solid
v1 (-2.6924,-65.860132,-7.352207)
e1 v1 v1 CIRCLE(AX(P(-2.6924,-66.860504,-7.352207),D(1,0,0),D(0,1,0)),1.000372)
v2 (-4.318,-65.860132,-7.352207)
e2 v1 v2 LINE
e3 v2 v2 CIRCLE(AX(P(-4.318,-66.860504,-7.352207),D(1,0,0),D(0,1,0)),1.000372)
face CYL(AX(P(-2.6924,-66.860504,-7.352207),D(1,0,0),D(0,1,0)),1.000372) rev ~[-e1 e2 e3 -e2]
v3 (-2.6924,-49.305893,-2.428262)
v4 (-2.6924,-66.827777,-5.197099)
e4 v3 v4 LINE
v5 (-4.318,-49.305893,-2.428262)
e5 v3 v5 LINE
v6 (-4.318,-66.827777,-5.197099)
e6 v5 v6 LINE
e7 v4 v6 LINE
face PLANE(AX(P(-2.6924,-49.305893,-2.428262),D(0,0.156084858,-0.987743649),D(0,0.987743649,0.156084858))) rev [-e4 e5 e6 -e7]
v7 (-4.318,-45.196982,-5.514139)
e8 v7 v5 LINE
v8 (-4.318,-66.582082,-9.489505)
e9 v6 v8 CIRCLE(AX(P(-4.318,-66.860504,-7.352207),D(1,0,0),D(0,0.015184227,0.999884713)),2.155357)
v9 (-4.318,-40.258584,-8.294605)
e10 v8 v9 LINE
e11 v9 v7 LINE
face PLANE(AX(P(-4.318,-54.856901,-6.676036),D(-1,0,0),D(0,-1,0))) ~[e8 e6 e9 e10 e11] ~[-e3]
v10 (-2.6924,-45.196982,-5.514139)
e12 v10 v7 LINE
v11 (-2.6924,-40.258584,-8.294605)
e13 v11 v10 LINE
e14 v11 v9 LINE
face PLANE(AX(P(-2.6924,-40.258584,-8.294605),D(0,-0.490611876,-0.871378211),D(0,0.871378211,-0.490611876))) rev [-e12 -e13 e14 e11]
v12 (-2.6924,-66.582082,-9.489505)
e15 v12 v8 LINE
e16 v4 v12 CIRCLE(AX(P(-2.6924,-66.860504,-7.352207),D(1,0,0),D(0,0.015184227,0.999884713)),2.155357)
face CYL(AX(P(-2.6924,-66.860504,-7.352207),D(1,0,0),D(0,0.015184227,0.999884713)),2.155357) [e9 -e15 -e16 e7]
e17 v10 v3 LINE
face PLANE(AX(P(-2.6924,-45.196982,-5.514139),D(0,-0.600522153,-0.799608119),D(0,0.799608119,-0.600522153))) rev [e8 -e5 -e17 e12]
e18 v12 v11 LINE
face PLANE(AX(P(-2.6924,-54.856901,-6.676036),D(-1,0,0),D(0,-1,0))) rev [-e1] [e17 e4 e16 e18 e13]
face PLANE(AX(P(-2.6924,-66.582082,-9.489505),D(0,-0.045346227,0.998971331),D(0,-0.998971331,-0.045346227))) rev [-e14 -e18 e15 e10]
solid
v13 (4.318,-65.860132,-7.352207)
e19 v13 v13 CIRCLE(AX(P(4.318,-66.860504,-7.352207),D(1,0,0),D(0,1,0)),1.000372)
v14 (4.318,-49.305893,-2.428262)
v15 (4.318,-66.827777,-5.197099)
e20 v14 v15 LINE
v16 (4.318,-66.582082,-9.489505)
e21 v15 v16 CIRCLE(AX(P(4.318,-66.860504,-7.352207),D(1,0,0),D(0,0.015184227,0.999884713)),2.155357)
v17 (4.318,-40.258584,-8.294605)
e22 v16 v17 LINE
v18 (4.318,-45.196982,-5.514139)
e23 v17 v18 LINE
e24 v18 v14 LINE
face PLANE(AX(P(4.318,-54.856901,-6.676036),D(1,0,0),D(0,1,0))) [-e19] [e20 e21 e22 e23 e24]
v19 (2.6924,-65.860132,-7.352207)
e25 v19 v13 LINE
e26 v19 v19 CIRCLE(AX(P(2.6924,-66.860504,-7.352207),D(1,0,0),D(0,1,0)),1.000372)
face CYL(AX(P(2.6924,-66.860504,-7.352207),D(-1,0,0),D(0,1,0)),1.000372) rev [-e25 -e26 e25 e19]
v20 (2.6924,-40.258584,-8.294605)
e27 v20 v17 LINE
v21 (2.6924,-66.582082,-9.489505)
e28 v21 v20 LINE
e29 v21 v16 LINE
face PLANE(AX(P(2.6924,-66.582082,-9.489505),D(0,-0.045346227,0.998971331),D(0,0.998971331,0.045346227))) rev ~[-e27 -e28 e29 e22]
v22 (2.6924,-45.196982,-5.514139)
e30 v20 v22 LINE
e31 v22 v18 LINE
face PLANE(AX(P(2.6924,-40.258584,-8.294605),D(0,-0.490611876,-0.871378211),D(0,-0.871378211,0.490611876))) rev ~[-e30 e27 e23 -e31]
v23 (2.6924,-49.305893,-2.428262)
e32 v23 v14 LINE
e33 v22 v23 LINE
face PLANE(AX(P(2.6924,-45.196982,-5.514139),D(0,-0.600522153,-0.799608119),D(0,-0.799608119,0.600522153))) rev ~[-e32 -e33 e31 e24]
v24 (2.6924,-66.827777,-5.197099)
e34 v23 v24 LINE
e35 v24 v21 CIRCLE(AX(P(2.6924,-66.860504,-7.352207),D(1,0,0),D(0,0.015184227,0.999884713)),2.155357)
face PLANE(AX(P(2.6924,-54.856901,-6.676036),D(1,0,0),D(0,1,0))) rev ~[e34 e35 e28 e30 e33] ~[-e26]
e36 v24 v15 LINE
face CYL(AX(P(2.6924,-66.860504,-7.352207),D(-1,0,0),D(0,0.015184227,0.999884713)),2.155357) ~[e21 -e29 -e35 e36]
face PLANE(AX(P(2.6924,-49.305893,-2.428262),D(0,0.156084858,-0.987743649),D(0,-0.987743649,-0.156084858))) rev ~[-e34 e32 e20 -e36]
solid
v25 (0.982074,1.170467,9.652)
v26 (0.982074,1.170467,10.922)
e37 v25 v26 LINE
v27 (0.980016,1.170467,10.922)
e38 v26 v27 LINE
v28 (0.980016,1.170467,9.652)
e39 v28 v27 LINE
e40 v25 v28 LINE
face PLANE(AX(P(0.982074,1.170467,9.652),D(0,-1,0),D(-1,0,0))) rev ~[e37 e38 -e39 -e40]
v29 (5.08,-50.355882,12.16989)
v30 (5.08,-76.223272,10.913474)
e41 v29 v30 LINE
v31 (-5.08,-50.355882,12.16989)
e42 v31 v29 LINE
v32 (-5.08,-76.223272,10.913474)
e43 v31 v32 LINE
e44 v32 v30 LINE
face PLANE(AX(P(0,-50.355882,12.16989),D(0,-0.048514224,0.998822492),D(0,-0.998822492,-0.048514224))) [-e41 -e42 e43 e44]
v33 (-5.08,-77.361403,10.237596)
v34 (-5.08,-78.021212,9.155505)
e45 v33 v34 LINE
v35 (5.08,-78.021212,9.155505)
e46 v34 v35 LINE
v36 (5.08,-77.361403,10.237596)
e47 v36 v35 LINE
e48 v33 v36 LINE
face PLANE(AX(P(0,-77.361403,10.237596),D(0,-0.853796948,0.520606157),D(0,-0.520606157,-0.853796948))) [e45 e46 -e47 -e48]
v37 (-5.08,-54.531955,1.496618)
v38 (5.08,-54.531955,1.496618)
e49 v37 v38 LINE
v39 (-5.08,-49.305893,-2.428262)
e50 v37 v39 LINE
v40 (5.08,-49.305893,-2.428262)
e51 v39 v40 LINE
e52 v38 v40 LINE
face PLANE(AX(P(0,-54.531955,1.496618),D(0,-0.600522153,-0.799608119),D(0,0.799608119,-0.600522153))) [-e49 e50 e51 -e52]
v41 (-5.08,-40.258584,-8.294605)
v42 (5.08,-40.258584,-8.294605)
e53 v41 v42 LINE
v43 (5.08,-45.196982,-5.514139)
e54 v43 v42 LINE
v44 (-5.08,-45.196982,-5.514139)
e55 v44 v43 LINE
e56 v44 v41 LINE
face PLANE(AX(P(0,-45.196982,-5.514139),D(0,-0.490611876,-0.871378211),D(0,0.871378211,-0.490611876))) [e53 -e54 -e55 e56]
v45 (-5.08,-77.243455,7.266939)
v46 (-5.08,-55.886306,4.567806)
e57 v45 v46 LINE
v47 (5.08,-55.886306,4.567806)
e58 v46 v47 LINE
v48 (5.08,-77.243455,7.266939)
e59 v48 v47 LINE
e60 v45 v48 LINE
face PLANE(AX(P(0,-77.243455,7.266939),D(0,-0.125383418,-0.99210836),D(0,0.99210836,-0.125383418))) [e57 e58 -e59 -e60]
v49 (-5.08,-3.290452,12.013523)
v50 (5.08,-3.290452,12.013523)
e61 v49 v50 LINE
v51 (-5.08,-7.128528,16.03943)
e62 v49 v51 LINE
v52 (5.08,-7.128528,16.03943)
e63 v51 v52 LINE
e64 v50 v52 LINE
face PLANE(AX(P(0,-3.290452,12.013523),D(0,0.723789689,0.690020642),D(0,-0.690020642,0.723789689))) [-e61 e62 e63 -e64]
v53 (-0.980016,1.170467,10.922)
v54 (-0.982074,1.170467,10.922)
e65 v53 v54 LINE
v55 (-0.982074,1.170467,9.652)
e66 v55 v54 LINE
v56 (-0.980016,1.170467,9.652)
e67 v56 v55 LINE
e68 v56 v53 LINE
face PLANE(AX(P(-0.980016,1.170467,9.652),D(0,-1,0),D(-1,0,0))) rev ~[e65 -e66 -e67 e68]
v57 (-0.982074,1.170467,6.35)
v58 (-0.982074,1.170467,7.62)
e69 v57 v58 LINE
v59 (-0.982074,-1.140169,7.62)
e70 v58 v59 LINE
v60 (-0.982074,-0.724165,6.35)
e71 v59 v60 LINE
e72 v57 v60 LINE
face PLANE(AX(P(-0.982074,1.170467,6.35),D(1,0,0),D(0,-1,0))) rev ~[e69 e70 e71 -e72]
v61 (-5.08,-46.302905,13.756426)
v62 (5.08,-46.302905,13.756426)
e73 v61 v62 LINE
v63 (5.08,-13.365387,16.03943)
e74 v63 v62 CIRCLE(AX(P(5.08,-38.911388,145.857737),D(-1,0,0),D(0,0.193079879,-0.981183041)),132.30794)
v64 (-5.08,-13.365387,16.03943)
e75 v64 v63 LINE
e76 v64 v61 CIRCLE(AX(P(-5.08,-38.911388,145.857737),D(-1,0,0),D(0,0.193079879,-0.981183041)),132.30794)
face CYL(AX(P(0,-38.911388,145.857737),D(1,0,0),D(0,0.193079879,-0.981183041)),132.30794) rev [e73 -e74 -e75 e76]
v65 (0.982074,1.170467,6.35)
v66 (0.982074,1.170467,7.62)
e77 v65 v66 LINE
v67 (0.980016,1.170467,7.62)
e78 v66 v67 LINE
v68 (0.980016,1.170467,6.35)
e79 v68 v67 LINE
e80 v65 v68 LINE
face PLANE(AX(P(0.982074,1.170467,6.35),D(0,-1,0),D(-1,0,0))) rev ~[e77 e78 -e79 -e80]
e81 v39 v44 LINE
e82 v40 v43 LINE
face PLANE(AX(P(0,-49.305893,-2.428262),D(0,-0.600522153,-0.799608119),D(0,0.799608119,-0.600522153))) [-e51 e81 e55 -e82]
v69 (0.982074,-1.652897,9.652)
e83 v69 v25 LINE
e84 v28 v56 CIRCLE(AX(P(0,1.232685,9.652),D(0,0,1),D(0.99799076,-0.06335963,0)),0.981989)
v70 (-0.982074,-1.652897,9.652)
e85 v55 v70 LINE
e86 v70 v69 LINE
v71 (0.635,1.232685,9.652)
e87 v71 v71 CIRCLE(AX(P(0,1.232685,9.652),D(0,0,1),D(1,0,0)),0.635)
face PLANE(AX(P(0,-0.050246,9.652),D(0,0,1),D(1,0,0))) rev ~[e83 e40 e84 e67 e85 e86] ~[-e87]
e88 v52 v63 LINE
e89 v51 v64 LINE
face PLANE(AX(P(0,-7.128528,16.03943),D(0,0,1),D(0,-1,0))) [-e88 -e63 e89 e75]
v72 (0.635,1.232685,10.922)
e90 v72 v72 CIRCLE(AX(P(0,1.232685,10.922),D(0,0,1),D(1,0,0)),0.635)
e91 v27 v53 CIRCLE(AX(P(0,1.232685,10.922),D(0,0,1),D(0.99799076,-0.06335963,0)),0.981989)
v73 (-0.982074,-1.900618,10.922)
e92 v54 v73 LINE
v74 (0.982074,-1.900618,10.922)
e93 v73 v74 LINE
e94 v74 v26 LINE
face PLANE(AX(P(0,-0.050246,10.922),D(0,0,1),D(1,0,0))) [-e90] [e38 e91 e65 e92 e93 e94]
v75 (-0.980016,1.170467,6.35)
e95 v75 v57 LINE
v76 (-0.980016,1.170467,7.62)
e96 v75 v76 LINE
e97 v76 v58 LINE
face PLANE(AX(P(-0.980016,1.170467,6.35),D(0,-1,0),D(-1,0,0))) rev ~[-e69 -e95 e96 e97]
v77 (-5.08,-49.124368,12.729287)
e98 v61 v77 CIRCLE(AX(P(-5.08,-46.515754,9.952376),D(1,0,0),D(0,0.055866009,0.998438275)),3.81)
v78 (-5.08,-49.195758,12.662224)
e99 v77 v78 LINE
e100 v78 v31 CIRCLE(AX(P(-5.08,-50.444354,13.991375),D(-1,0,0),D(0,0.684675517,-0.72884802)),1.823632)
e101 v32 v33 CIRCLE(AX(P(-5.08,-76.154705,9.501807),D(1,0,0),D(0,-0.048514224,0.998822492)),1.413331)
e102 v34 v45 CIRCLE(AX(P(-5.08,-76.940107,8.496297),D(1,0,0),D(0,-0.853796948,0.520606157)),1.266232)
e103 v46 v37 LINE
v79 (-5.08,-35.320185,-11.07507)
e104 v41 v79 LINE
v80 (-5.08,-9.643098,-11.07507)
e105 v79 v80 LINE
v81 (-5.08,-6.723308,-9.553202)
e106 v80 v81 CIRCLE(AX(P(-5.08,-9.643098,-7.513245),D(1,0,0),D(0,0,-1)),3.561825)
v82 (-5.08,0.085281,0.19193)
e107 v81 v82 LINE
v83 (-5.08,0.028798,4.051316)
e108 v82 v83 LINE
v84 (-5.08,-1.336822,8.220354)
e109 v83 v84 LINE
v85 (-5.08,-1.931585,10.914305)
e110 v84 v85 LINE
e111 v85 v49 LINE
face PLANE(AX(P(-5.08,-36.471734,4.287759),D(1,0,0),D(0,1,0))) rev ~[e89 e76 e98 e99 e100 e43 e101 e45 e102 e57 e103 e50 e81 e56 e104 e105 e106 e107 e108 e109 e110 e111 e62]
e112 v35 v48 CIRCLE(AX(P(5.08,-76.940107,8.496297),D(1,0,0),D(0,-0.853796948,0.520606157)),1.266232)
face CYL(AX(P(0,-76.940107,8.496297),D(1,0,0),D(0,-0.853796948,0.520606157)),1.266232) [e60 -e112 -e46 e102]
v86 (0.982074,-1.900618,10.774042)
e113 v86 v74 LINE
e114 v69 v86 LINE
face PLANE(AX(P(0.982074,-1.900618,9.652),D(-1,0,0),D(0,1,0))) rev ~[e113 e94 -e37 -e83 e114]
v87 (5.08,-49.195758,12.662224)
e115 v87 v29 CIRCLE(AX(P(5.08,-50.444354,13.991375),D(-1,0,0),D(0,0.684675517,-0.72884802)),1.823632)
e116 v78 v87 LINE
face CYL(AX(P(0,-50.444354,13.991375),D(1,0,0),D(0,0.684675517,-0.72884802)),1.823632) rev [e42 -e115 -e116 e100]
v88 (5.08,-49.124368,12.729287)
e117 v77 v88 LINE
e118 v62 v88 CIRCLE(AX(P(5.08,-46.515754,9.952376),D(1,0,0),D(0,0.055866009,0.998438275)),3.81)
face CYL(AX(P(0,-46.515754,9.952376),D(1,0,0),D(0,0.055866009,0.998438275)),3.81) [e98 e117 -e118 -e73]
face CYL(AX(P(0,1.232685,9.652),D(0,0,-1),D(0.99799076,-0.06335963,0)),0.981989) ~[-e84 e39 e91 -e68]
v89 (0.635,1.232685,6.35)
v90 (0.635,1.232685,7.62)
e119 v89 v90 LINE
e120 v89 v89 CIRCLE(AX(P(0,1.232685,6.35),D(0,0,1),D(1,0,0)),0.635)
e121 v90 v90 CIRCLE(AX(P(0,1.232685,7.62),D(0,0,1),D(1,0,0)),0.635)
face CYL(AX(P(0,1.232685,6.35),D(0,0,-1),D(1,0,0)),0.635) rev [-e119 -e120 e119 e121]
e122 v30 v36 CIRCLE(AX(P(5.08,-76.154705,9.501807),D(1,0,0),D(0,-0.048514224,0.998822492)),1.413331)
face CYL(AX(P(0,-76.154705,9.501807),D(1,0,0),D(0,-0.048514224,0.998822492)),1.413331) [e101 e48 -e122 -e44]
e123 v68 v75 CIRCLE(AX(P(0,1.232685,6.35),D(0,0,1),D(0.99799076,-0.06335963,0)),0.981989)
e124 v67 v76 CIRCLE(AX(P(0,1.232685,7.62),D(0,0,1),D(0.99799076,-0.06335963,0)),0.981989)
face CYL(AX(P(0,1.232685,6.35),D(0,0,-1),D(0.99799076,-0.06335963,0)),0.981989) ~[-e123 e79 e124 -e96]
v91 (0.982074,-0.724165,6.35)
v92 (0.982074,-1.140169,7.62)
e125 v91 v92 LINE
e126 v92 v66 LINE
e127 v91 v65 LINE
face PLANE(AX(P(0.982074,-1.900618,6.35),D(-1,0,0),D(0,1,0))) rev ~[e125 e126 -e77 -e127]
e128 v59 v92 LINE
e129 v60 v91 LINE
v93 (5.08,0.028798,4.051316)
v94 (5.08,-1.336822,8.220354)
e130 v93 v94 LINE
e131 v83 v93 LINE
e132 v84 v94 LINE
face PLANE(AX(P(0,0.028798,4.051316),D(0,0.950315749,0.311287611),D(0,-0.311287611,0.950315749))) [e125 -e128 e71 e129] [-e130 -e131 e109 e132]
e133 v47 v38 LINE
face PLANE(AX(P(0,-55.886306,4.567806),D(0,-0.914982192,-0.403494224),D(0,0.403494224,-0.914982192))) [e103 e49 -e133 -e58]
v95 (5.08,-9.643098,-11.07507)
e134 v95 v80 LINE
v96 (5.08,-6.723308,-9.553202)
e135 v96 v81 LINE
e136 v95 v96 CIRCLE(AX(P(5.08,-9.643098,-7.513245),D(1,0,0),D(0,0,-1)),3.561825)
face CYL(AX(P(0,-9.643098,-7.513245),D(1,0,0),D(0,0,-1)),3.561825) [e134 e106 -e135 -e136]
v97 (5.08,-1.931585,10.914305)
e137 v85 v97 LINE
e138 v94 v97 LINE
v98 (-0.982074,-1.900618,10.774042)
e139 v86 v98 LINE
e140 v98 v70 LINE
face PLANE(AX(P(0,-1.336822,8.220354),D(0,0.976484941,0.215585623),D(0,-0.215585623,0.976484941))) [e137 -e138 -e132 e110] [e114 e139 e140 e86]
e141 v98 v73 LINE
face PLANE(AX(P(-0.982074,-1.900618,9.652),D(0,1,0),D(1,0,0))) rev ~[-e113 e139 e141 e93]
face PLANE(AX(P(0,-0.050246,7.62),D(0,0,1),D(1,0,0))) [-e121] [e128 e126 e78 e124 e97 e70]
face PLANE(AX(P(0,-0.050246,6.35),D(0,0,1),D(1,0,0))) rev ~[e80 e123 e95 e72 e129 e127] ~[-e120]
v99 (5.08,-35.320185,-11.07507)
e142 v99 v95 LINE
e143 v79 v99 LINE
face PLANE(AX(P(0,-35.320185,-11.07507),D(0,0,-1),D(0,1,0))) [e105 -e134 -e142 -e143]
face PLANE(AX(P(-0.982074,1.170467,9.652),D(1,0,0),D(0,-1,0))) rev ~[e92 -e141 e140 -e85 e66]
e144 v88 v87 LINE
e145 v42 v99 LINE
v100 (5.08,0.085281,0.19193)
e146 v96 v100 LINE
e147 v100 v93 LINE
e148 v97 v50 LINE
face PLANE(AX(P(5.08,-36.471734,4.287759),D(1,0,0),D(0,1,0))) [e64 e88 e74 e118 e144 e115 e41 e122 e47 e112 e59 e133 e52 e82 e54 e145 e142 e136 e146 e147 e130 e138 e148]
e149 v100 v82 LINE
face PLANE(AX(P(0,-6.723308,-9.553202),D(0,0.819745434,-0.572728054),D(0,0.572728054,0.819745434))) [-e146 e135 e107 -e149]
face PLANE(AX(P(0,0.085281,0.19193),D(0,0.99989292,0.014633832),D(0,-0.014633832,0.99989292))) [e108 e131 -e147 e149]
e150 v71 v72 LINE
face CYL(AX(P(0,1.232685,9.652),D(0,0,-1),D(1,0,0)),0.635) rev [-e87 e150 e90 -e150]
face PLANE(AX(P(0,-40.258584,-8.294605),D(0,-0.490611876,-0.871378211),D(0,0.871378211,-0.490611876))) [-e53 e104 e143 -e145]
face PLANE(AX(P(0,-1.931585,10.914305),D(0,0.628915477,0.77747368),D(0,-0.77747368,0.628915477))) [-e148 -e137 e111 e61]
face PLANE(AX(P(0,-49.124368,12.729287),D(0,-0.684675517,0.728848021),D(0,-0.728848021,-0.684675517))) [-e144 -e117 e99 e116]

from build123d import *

# Parameters (mm, degrees)
F1_DEPTH      = 5.08
F1_DEPTH_BACK = 5.08
F2_START      = 2.6924
F0_R          = 1.0003723125
F2_DEPTH      = 1.6256
F5_START      = 9.652
F4_R          = 0.635
F5_DEPTH      = 1.27
F6_START      = 6.35
F6_DEPTH      = 1.27


with BuildPart() as f1:
    # F0 (on Right) → F1 (new body, two sides)
    with BuildSketch(Plane.YZ) as f1_sk:
        with BuildLine():
            Line((0.0852813464, 0.1919296192), (0.0287976927, 4.0513155982))
            Line((0.0287976927, 4.0513155982), (-1.336822079, 8.2203539118))
            Line((-1.336822079, 8.2203539118), (-1.9315851387, 10.914305225))
            Line((-1.9315851387, 10.914305225), (-3.2904522843, 12.013522602))
            Line((-3.2904522843, 12.013522602), (-7.1285278888, 16.0394304962))
            Line((-7.1285278888, 16.0394304962), (-13.3653870204, 16.0394304962))
            ThreePointArc((-13.3653870204, 16.0394304962), (-29.7626529342, 13.8664815487), (-46.3029045757, 13.7564260577))
            ThreePointArc((-46.3029045757, 13.7564260577), (-47.8190863835, 13.5325193665), (-49.1243677886, 12.7292871869))
            Line((-49.1243677886, 12.7292871869), (-49.1957577746, 12.6622238566))
            ThreePointArc((-49.1957577746, 12.6622238566), (-49.7319383294, 12.3126553679), (-50.3558819852, 12.1698897204))
            Line((-50.3558819852, 12.1698897204), (-76.2232715204, 10.9134739549))
            ThreePointArc((-76.2232715204, 10.9134739549), (-76.8763540697, 10.7170137111), (-77.3614025915, 10.237595965))
            Line((-77.3614025915, 10.237595965), (-78.0212117411, 9.1555053464))
            ThreePointArc((-78.0212117411, 9.1555053464), (-78.1109393732, 8.0141207108), (-77.2434551545, 7.2669386283))
            Line((-77.2434551545, 7.2669386283), (-55.8863058686, 4.5678056777))
            Line((-55.8863058686, 4.5678056777), (-54.5319553308, 1.4966176624))
            Line((-54.5319553308, 1.4966176624), (-49.3058934109, -2.4282623857))
            Line((-49.3058934109, -2.4282623857), (-45.1969819986, -5.514139413))
            Line((-45.1969819986, -5.514139413), (-40.2585836646, -8.2946047065))
            Line((-40.2585836646, -8.2946047065), (-35.3201853305, -11.07507))
            Line((-35.3201853305, -11.07507), (-9.6430980807, -11.07507))
            ThreePointArc((-9.6430980807, -11.07507), (-7.9967951351, -10.6717705814), (-6.7233083962, -9.5532021501))
            Line((-6.7233083962, -9.5532021501), (0.0852813464, 0.1919296192))
        make_face()
    extrude(amount=F1_DEPTH)
    extrude(f1_sk.sketch, amount=-F1_DEPTH_BACK)

    # F4 (on Top) → F5 (join)
    with BuildSketch(Plane.XY.offset(F5_START)):
        with BuildLine():
            Line((-0.9820741736, 1.1704666201), (-0.9820741736, -1.900618134))
            Line((-0.9820741736, -1.900618134), (0.9820741736, -1.900618134))
            Line((0.9820741736, -1.900618134), (0.9820741736, 1.1704666201))
            Line((0.9820741736, 1.1704666201), (0.9800161632, 1.1704666201))
            ThreePointArc((0.9800161632, 1.1704666201), (0, 2.2146743084), (-0.9800161632, 1.1704666201))
            Line((-0.9800161632, 1.1704666201), (-0.9820741736, 1.1704666201))
        make_face()
        with Locations((0, 1.2326850933)):
            Circle(F4_R, mode=Mode.SUBTRACT)
    extrude(amount=F5_DEPTH)

    # F4 (on Top) → F6 (join)
    with BuildSketch(Plane.XY.offset(F6_START)):
        with BuildLine():
            Line((-0.9820741736, 1.1704666201), (-0.9820741736, -1.900618134))
            Line((-0.9820741736, -1.900618134), (0.9820741736, -1.900618134))
            Line((0.9820741736, -1.900618134), (0.9820741736, 1.1704666201))
            Line((0.9820741736, 1.1704666201), (0.9800161632, 1.1704666201))
            ThreePointArc((0.9800161632, 1.1704666201), (0, 2.2146743084), (-0.9800161632, 1.1704666201))
            Line((-0.9800161632, 1.1704666201), (-0.9820741736, 1.1704666201))
        make_face()
        with Locations((0, 1.2326850933)):
            Circle(F4_R, mode=Mode.SUBTRACT)
    extrude(amount=F6_DEPTH)


with BuildPart() as f2:
    # F0 (on Right) → F2 (new body)
    with BuildSketch(Plane.YZ.offset(F2_START)):
        with BuildLine():
            Line((-66.5820820244, -9.489505192), (-40.2585836646, -8.2946047065))
            Line((-40.2585836646, -8.2946047065), (-45.1969819986, -5.514139413))
            Line((-45.1969819986, -5.514139413), (-49.3058934109, -2.4282623857))
            Line((-49.3058934109, -2.4282623857), (-66.8277770233, -5.1970989376))
            ThreePointArc((-66.8277770233, -5.1970989376), (-69.0123388798, -7.4753769211), (-66.5820820244, -9.489505192))
        make_face()
        with Locations((-66.8605044484, -7.3522070888)):
            Circle(F0_R, mode=Mode.SUBTRACT)
    extrude(amount=F2_DEPTH)


with BuildPart() as f3_1:
    # F3: instance of F2
    add(f2.part.mirror(Plane.YZ))


solid = Compound([f1.part, f2.part, f3_1.part])
